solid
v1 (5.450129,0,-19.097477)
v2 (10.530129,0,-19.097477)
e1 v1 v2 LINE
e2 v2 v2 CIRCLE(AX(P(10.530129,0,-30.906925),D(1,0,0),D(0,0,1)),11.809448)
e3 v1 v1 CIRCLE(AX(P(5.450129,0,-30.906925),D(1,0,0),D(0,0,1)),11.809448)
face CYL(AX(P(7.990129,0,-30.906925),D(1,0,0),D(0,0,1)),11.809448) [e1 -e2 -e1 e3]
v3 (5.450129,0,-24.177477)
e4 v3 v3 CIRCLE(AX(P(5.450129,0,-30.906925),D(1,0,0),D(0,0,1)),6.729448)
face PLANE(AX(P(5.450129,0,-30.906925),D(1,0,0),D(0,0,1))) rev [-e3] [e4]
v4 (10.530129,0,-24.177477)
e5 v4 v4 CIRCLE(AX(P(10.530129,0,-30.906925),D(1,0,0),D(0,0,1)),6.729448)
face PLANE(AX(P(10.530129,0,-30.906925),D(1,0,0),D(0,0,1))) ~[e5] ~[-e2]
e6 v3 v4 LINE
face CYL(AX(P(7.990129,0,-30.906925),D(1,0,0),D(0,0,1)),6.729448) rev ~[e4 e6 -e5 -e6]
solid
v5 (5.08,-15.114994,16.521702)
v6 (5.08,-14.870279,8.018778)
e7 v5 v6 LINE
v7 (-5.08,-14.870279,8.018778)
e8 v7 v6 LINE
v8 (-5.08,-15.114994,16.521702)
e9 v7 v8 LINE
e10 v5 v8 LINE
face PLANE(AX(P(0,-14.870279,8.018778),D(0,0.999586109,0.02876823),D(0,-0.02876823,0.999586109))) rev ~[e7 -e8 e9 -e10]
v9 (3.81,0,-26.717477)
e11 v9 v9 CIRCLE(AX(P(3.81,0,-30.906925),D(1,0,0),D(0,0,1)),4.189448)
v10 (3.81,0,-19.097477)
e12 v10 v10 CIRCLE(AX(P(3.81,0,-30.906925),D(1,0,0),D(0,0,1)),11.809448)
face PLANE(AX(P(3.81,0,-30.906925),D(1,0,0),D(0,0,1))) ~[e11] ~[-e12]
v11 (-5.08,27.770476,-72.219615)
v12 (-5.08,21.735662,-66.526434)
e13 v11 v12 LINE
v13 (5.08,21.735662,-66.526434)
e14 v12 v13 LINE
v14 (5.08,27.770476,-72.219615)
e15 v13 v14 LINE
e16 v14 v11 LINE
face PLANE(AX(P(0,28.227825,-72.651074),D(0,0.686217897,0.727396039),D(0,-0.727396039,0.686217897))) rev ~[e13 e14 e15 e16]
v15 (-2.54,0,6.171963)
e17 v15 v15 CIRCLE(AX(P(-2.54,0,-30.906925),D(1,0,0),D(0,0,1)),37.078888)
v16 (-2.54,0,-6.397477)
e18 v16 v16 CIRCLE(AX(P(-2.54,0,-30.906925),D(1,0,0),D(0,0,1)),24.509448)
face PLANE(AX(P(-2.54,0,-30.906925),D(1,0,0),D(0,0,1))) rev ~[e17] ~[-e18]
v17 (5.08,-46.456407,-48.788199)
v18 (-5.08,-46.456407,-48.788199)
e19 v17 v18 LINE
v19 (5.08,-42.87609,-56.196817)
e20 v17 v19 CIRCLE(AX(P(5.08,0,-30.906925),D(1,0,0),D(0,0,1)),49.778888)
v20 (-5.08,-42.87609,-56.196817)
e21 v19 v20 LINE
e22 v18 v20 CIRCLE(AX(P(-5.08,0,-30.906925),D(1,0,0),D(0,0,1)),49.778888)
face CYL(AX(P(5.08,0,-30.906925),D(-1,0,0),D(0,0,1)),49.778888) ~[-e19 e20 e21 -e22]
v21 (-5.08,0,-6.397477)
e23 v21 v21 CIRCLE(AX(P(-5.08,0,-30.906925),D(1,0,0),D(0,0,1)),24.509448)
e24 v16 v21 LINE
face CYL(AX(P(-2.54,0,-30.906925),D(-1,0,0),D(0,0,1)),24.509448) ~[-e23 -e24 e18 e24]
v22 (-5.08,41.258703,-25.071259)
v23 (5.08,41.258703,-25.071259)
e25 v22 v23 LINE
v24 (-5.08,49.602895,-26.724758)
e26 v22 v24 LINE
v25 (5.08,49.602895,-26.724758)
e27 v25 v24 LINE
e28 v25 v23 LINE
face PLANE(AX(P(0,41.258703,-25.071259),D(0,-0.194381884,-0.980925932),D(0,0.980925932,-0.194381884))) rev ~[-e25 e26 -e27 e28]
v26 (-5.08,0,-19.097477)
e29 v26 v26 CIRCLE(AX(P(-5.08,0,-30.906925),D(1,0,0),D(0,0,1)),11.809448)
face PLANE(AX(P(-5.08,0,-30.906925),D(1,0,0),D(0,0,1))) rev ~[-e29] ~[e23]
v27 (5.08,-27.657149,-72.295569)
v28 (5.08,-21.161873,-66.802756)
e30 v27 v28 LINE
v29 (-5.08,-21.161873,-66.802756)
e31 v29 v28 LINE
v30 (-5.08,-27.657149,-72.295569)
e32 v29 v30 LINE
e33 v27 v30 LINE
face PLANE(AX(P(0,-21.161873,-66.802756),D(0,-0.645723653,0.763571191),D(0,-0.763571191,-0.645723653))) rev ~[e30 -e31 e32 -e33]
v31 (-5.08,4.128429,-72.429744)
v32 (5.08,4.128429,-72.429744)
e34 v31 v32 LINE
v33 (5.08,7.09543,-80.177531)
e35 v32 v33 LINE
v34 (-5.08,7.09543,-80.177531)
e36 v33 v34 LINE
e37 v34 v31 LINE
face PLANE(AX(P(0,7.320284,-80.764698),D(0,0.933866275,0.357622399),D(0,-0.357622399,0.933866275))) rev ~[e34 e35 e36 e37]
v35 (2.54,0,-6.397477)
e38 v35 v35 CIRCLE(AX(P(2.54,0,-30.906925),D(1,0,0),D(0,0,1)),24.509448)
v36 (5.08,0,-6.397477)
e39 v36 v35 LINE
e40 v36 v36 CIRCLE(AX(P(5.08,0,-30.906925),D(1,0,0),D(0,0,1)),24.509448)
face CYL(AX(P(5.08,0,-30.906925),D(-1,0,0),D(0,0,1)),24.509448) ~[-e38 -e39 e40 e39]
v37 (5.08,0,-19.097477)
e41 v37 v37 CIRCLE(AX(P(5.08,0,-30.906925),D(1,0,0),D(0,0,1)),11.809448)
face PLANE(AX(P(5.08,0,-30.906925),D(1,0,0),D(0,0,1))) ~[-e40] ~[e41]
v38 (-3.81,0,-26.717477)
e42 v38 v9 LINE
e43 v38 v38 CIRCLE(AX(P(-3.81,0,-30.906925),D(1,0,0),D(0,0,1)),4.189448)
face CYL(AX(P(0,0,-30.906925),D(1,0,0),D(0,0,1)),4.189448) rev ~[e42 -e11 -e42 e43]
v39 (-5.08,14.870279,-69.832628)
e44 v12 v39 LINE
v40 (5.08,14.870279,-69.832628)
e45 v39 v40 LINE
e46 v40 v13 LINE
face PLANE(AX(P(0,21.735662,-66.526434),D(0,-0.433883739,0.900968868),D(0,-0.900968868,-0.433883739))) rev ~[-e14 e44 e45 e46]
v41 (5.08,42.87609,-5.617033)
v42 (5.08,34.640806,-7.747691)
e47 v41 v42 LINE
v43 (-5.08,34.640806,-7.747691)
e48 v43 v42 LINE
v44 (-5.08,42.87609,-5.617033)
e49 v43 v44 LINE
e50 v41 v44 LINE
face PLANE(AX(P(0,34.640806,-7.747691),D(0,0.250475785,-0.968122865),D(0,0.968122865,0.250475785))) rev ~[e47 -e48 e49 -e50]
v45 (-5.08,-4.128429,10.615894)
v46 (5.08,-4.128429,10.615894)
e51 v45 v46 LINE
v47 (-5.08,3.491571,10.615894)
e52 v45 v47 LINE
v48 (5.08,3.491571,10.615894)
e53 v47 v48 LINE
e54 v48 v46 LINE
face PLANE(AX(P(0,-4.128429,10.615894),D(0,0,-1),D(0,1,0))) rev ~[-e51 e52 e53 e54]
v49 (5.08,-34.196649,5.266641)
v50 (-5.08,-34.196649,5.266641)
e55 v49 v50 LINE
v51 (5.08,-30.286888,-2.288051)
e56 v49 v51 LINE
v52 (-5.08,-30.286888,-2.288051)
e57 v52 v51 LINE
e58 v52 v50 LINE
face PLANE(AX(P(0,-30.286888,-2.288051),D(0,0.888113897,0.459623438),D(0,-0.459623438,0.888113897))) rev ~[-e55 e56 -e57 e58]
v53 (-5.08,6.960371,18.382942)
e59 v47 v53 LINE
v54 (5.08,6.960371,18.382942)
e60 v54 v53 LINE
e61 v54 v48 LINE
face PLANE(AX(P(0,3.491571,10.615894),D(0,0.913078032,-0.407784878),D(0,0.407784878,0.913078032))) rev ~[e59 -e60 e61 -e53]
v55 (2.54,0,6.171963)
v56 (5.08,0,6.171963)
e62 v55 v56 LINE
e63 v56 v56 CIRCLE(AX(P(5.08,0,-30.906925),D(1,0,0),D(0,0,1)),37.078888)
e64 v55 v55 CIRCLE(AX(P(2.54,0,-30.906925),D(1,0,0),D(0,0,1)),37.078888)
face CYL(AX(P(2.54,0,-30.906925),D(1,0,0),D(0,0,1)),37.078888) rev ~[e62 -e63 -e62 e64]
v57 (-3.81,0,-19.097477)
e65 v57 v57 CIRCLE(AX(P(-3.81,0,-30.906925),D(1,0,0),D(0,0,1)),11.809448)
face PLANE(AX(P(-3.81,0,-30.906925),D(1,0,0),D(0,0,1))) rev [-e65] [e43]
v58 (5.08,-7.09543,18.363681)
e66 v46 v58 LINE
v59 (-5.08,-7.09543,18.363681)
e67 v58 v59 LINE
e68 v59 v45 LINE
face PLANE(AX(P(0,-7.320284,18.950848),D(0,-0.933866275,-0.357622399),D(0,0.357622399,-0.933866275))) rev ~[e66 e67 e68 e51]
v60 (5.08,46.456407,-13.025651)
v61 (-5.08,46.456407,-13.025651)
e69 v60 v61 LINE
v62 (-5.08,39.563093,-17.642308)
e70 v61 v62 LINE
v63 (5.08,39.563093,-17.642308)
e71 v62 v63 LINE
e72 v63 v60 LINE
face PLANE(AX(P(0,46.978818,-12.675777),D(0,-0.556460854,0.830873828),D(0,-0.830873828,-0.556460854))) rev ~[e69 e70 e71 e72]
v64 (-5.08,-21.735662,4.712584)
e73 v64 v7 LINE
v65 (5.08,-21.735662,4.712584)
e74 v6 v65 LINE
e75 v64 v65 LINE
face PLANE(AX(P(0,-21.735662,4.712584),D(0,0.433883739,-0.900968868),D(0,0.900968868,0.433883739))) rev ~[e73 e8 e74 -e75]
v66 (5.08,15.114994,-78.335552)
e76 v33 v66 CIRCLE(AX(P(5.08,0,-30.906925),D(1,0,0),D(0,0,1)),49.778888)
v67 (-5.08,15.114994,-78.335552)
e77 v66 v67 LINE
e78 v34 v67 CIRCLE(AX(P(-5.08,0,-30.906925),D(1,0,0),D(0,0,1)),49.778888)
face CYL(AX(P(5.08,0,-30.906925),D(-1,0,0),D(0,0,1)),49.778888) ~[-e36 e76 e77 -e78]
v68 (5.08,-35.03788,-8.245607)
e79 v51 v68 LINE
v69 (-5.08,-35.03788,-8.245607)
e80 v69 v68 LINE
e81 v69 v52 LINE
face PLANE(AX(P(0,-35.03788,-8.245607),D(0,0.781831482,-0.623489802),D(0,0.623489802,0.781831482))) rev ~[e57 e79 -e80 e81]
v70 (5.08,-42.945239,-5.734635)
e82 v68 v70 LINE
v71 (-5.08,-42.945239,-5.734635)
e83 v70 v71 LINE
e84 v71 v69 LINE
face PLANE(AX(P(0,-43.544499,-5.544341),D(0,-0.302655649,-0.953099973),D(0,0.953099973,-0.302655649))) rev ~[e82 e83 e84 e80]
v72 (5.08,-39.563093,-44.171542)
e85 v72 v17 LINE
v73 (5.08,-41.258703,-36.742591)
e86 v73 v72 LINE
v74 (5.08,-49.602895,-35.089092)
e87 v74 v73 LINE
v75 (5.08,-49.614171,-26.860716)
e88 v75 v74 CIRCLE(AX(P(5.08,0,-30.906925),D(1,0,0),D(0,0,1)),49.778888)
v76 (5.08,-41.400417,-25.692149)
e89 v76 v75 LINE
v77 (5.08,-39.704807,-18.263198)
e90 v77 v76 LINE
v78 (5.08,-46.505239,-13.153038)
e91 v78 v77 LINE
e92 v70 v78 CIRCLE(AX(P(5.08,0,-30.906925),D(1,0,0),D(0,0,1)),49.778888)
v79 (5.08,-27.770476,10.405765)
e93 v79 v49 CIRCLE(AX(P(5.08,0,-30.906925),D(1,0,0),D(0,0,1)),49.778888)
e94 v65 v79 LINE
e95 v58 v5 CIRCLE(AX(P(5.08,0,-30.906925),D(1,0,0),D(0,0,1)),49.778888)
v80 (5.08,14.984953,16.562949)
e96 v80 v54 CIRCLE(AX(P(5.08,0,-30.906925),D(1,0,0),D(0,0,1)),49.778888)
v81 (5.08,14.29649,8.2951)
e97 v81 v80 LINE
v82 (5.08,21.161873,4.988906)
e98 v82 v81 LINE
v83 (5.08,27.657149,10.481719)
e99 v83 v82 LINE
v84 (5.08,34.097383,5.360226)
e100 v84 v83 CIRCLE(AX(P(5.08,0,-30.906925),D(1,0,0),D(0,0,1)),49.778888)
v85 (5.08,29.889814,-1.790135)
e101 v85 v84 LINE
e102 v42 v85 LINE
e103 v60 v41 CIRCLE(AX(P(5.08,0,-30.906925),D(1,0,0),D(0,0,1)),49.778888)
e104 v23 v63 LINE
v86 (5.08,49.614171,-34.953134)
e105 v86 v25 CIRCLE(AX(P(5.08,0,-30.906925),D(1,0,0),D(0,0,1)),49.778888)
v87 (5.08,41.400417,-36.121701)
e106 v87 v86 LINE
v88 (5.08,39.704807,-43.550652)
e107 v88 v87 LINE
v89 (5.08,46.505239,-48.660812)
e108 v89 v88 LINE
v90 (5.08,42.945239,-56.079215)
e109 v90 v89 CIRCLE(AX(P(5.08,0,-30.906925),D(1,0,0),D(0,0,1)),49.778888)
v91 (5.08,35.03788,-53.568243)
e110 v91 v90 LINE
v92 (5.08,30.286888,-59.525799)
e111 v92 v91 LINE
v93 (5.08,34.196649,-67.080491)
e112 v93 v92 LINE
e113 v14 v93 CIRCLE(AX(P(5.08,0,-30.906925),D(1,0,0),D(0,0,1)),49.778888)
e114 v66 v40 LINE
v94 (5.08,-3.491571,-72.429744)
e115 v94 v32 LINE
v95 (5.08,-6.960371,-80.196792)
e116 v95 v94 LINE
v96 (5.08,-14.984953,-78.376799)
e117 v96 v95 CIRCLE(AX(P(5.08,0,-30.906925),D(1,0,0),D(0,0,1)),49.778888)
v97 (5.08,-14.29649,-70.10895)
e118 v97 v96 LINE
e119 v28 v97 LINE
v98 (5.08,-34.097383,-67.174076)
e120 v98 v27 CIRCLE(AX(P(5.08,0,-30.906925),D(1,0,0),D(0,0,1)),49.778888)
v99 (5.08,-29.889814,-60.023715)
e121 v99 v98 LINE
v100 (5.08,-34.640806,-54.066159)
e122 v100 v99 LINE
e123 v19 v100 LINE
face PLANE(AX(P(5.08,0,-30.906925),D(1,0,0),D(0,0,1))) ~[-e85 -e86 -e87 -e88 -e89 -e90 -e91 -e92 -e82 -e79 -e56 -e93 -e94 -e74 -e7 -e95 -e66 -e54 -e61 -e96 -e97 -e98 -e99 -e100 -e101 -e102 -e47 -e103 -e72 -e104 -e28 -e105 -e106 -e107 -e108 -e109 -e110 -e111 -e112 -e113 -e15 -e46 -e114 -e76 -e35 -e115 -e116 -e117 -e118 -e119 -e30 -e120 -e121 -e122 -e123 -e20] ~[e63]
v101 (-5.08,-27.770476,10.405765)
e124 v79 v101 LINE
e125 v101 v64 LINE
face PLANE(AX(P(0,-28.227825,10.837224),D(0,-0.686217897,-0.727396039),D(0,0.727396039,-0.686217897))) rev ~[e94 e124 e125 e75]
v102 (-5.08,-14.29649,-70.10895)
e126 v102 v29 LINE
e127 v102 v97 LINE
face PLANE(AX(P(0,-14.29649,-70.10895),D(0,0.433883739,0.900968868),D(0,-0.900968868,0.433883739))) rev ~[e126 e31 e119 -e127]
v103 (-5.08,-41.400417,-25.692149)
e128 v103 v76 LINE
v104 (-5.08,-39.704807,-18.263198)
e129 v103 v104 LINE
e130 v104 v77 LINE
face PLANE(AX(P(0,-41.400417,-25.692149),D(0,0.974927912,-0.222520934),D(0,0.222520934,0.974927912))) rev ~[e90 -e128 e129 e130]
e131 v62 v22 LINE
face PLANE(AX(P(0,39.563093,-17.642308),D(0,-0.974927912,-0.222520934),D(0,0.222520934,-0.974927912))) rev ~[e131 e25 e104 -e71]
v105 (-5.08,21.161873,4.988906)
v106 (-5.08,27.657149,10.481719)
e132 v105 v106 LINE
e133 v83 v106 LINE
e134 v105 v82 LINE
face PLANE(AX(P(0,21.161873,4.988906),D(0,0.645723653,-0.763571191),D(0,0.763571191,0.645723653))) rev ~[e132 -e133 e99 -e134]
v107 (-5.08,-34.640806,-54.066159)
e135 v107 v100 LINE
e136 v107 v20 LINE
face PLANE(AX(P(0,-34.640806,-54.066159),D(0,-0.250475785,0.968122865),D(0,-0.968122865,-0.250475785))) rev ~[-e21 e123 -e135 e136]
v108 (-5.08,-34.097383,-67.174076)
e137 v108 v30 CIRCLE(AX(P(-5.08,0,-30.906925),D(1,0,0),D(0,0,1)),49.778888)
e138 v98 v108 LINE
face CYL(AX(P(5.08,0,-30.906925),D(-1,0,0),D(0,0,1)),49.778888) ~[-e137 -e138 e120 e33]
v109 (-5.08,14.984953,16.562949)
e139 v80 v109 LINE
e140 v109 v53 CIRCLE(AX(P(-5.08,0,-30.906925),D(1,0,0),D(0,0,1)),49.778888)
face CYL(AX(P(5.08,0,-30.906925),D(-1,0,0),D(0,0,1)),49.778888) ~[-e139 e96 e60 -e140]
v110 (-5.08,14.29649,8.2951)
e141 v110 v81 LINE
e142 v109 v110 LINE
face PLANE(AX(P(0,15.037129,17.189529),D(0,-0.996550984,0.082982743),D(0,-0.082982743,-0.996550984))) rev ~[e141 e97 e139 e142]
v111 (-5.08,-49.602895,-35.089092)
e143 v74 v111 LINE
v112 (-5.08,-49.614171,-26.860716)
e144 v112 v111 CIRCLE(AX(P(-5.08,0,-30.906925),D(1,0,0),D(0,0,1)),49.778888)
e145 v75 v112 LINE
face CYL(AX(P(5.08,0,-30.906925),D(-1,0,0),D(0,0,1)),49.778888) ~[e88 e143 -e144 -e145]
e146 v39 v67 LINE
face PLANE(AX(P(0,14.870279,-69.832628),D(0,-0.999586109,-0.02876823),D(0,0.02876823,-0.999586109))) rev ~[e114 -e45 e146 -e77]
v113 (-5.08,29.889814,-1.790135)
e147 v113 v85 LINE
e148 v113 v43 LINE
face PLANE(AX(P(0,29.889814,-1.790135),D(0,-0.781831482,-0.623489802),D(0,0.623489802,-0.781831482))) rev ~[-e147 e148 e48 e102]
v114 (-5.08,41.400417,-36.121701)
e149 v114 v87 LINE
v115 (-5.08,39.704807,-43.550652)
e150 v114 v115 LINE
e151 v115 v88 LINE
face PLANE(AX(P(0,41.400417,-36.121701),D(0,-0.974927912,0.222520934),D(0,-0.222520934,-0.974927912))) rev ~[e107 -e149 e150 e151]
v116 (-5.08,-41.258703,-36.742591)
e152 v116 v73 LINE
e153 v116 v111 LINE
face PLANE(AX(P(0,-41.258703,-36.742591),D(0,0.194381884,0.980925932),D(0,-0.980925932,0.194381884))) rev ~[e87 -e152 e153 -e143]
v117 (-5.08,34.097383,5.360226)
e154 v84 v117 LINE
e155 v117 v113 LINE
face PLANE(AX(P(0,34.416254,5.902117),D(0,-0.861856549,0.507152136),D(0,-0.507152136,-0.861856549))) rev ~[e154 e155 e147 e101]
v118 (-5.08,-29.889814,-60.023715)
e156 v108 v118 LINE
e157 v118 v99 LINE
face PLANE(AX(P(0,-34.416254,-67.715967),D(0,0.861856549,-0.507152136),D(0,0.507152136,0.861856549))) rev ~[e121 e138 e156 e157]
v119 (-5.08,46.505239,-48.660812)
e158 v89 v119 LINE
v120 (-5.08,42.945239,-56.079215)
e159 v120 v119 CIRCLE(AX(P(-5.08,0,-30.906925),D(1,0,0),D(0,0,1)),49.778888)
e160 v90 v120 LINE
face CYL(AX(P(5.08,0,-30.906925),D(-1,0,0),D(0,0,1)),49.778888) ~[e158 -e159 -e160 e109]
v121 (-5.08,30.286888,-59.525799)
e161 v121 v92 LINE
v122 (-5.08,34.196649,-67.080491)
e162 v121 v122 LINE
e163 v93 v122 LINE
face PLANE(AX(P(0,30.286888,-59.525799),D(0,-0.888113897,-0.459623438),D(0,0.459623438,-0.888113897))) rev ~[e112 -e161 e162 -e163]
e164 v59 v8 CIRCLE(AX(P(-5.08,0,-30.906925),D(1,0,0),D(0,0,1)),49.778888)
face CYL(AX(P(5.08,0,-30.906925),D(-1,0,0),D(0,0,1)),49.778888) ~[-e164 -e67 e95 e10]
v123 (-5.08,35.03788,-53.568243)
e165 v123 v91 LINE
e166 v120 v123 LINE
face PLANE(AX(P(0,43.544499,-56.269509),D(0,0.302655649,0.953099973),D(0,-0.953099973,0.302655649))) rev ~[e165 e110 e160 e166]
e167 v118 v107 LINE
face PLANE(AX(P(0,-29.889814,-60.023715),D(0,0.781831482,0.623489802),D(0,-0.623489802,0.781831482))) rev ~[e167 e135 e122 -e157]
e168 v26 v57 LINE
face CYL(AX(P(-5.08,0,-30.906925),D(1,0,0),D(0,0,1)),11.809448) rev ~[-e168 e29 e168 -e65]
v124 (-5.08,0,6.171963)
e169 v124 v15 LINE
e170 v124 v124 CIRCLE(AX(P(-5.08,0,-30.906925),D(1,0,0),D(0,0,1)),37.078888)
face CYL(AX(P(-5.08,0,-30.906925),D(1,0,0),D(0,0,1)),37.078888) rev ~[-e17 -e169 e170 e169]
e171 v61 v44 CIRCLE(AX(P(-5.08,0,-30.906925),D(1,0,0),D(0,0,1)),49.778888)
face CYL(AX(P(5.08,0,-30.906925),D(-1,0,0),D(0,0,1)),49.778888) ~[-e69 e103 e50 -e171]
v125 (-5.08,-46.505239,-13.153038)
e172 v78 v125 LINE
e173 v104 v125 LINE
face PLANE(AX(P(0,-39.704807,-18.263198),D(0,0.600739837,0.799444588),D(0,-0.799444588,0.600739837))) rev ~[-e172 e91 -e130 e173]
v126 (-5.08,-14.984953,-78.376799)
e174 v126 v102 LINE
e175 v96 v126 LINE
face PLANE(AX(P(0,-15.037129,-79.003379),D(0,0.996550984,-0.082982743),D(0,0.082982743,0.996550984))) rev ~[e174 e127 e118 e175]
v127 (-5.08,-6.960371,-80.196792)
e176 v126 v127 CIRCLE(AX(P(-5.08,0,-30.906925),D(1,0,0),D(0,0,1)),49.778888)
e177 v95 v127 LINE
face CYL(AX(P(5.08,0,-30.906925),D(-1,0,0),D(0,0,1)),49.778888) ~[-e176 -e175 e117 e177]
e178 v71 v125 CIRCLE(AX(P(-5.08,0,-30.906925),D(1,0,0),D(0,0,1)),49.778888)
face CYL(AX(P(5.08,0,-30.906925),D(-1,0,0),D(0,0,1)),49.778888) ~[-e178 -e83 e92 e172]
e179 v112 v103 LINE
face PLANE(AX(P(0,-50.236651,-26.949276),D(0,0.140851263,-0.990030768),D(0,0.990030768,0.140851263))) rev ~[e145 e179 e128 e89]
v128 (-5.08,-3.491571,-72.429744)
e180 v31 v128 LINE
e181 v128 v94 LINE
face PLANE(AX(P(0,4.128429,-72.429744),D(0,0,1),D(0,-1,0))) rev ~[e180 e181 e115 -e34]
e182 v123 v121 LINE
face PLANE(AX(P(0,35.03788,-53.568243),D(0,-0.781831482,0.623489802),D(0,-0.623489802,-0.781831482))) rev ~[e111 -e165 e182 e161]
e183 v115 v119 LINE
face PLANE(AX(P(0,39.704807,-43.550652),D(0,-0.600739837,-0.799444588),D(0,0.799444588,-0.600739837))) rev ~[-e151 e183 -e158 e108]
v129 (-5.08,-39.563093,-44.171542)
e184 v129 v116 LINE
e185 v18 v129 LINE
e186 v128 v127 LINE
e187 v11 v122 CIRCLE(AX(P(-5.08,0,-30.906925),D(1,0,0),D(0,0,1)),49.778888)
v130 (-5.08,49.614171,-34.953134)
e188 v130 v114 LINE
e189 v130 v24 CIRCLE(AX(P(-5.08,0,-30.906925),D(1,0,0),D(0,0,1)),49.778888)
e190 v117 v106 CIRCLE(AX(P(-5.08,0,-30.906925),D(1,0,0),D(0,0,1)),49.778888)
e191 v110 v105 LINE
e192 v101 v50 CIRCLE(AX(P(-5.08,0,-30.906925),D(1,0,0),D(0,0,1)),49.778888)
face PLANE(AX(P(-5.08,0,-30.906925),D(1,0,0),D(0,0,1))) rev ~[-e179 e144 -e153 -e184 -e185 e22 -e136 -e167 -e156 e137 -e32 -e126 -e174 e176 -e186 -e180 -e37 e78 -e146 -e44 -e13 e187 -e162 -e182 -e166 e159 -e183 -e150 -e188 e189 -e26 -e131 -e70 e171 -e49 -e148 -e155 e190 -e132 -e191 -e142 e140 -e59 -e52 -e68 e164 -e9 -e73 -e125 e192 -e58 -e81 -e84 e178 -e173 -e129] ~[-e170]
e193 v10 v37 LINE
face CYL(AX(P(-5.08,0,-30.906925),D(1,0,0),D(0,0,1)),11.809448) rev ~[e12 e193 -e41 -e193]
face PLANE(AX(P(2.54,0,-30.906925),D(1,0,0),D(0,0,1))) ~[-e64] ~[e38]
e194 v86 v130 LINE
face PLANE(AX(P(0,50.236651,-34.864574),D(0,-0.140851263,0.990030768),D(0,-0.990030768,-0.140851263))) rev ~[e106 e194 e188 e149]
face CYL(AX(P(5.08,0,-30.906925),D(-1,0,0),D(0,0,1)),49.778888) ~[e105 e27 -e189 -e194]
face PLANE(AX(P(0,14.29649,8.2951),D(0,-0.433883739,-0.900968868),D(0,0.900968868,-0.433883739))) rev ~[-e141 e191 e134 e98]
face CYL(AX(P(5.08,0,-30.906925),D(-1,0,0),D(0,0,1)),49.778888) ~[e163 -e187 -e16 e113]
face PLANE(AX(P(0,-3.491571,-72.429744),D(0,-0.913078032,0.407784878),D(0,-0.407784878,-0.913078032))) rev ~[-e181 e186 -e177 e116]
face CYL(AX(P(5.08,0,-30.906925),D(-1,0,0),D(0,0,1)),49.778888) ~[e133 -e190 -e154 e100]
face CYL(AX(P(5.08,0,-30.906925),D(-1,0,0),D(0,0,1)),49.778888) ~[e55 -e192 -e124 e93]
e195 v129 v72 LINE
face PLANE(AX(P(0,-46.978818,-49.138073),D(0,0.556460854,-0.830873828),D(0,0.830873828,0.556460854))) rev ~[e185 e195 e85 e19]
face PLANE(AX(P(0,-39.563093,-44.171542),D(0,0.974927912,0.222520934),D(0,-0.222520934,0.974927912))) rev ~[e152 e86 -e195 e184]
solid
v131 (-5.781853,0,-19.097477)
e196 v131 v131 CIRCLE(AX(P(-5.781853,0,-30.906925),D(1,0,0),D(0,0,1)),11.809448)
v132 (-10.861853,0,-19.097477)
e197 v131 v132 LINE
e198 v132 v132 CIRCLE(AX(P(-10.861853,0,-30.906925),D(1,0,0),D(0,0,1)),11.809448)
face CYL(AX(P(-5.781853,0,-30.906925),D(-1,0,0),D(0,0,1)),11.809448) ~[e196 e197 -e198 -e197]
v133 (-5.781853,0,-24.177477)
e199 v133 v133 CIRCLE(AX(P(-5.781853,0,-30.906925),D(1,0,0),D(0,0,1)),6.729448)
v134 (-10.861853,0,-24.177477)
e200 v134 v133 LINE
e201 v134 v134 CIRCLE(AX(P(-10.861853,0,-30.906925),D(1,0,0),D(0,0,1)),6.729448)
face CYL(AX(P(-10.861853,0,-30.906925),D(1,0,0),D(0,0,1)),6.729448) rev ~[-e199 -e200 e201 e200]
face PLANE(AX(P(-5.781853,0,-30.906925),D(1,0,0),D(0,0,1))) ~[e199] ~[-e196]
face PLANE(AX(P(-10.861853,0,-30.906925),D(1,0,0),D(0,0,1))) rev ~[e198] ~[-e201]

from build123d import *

# Parameters (mm, degrees)
F0_W            = 5.08
F0_H            = 5.08
F0_W_2          = 7.62
F0_H_2          = 7.62
F3_DEPTH        = 12.7
F3_COPIES_COUNT = 14


# Not quite as in the source:
# - a feature of the source that left no trace in its solid (it failed there, or was rolled back) is left out
# - a pattern or mirror of a feature is missing from the dataset's text; its kind, count and spacing are read off the source's solid


with BuildPart() as f1:
    # F0 (on Front) → F1 (revolve)
    with BuildSketch(Plane.XZ):
        with Locations((7.990129427, -21.6374768325)):
            Rectangle(F0_W, F0_H)
    revolve(axis=Axis((0.4135672934, 0, -30.9069249779), (1, 0, 0)))


with BuildPart() as f1b:
    # F0 (on Front) → F1, piece 2 (revolve)
    with BuildSketch(Plane.XZ):
        Polygon((-5.7818528368, -24.1774768325), (-5.7818528368, -19.0974768325), (-10.5137031422, -19.0974768325), (-10.8618528368, -19.0974768325), (-10.8618528368, -24.1774768325), align=None)
    revolve(axis=Axis((0.4135672934, 0, -30.9069249779), (1, 0, 0)))


with BuildPart() as f1c:
    # F0 (on Front) → F1, piece 3 (revolve)
    with BuildSketch(Plane.XZ):
        Polygon((5.08, 18.8719633837), (-5.08, 18.8719633837), (-5.08, 6.1719633837), (-2.54, 6.1719633837), (-2.54, -6.3974768325), (-5.08, -6.3974768325), (-5.08, -19.0974768325), (-3.81, -19.0974768325), (3.81, -19.0974768325), (5.08, -19.0974768325), (5.08, -6.3974768325), (2.54, -6.3974768325), (2.54, 6.1719633837), (5.08, 6.1719633837), align=None)
        with Locations((0, -22.9074768325)):
            Rectangle(F0_W_2, F0_H_2)
    revolve(axis=Axis((0.4135672934, 0, -30.9069249779), (1, 0, 0)))

    # F2 (on Right) → F3 (cut, symmetric)
    with BuildSketch(Plane.YZ):
        Polygon((-7.3202843778, 18.9508479089), (-4.1284287343, 10.6158936396), (3.4915712657, 10.6158936396), (7.2140004486, 18.9508479089), (-7.2140004486, 18.9508479089), align=None)
    f3 = extrude(amount=F3_DEPTH, both=True, mode=Mode.SUBTRACT)

    # F3_copies: F3 ×14 about axis
    f3_copies_axis = Axis((0, 0, -30.906925), (1, 0, 0))
    for i in range(1, F3_COPIES_COUNT):
        add(f3.rotate(f3_copies_axis, i * 360 / F3_COPIES_COUNT), mode=Mode.SUBTRACT)


solid = Compound([f1.part, f1b.part, f1c.part])
